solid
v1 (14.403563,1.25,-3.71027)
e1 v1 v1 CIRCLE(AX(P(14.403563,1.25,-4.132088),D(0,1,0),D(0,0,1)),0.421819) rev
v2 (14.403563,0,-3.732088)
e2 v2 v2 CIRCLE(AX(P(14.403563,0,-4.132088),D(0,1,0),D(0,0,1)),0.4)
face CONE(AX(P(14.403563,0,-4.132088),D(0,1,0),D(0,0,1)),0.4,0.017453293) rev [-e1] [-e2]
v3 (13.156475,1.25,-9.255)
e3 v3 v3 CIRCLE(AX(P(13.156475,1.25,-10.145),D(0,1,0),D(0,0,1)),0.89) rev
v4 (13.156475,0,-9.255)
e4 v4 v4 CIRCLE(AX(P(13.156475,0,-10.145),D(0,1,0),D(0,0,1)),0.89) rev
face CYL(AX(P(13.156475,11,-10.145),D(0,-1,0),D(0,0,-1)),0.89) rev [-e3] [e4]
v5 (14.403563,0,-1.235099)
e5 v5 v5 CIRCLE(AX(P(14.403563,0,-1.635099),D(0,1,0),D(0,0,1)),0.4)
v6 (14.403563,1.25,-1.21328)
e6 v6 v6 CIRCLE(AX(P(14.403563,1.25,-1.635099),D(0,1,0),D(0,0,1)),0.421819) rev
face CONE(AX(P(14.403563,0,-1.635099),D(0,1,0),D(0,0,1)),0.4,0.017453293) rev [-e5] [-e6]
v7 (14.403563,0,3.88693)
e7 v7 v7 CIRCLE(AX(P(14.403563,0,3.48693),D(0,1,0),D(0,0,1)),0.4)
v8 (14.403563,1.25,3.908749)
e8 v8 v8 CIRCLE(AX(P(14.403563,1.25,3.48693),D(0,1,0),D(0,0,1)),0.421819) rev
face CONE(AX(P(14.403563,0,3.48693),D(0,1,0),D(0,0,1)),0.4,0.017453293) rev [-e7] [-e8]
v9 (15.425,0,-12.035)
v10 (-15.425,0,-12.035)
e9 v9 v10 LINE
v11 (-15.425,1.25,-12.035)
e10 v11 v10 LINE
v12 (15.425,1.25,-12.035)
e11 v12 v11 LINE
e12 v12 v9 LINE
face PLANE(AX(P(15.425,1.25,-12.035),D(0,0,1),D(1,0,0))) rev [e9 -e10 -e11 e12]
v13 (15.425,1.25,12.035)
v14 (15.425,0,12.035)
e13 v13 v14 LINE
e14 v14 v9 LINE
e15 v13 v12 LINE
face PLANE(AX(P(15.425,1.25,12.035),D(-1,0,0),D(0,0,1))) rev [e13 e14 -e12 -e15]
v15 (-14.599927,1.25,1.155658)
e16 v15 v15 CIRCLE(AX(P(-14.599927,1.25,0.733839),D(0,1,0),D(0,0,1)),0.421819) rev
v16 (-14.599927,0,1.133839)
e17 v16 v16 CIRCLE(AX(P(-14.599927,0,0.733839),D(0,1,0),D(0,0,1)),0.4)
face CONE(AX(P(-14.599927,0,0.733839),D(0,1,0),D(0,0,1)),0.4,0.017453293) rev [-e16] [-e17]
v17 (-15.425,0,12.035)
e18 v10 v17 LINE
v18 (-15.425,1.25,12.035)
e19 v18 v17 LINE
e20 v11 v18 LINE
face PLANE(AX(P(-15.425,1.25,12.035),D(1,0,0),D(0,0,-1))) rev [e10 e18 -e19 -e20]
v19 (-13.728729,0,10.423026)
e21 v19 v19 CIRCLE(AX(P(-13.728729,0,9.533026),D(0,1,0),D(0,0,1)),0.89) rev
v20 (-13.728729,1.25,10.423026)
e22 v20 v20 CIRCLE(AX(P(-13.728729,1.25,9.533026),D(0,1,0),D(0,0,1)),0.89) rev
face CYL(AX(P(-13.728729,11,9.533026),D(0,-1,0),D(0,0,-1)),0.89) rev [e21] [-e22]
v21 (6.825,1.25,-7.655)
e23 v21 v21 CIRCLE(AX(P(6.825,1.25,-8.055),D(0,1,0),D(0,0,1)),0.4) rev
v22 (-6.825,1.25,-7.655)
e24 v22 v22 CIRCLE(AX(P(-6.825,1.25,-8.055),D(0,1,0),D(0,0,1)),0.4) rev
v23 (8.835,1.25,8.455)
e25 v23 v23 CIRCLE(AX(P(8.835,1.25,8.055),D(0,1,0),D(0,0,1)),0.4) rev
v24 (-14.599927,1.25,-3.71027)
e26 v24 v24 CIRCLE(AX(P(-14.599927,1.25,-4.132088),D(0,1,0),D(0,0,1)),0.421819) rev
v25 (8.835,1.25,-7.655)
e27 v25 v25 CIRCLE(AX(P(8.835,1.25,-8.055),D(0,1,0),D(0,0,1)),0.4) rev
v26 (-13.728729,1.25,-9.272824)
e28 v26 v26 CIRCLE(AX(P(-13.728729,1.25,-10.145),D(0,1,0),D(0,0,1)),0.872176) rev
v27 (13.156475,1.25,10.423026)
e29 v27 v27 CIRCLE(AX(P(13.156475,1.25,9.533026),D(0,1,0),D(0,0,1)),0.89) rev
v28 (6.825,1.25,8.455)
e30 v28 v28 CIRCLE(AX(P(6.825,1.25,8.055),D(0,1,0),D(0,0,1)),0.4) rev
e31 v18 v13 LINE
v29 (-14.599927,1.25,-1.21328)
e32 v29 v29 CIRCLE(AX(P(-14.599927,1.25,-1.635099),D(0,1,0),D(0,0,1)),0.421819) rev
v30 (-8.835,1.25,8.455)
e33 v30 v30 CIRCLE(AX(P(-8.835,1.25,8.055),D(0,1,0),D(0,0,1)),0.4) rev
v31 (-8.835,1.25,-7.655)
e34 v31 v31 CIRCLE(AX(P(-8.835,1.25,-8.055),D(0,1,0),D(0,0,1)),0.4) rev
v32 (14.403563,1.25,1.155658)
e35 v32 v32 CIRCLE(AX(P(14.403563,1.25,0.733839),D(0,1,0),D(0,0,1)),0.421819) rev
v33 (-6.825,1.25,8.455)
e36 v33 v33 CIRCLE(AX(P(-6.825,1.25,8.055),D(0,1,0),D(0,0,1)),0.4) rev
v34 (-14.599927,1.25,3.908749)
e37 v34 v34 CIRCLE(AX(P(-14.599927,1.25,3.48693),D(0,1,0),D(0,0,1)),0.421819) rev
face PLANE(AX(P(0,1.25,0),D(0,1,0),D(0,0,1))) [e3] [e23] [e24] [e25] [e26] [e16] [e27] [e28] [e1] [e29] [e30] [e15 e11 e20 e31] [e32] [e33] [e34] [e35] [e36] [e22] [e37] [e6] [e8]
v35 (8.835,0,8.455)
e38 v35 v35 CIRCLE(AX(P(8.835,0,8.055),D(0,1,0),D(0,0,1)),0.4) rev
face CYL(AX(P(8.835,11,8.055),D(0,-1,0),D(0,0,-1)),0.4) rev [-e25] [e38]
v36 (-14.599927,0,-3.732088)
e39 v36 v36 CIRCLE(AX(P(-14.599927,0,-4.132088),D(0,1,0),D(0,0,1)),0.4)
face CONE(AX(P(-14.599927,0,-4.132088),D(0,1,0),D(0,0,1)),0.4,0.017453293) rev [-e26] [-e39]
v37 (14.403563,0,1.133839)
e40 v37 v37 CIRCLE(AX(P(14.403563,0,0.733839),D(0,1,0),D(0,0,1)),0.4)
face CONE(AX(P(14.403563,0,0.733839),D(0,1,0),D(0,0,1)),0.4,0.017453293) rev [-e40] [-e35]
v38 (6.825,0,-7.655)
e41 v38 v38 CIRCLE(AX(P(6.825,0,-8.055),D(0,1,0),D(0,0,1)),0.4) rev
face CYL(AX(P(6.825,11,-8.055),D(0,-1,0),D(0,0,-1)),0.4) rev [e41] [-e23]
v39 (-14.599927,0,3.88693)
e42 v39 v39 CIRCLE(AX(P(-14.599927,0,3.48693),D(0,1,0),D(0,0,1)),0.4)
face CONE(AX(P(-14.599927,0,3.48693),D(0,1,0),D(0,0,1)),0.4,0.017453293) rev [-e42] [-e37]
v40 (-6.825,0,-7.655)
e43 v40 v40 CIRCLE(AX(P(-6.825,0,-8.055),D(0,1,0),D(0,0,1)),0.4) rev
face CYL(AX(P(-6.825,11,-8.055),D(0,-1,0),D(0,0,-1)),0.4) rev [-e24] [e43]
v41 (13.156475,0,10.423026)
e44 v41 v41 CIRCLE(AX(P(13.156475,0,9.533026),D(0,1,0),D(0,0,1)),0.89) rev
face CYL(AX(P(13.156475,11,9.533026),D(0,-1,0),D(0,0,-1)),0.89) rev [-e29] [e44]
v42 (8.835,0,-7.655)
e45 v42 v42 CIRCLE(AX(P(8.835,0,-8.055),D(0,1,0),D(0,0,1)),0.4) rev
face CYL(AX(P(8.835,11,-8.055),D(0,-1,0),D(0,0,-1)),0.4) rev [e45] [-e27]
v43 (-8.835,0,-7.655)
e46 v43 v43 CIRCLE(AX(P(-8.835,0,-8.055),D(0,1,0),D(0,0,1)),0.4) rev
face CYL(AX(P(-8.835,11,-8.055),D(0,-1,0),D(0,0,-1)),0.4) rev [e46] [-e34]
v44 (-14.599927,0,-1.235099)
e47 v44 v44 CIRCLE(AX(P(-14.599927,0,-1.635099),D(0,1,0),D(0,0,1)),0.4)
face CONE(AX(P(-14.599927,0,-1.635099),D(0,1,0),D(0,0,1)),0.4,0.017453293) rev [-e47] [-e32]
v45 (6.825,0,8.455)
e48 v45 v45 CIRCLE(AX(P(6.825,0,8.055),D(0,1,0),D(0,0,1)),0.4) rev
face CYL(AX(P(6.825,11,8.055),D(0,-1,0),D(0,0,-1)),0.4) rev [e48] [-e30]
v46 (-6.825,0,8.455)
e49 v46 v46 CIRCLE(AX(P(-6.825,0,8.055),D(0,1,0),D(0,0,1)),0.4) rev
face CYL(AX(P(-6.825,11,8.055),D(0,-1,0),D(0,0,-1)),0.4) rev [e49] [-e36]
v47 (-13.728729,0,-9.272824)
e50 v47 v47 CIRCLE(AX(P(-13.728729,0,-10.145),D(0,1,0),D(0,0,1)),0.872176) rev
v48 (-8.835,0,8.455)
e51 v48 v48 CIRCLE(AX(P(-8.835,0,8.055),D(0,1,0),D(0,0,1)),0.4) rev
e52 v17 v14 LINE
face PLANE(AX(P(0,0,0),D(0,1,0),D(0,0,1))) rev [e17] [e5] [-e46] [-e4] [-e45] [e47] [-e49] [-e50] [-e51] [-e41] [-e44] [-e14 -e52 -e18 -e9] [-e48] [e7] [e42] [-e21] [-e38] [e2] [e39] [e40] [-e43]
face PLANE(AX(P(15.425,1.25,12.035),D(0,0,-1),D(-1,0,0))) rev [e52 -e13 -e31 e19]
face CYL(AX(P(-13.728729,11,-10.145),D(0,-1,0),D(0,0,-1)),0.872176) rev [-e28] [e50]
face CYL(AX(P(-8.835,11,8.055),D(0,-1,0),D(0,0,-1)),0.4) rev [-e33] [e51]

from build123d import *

# Parameters (mm, degrees)
SKETCH_1_W               = 30.85
SKETCH_1_H               = 24.07
EXTRUDE_1_DEPTH          = 1.25
CUT_EXTRUDE_1_DEPTH      = 11
CUT_EXTRUDE_1_DEPTH_BACK = 11
SKETCH_2_R               = 0.872176239
SKETCH_2_R_2             = 0.89
SKETCH_2_R_3             = 0.4


# Read off the part's stored shape, not the designer's step: 切除-拉伸2
with BuildPart() as part:
    # 草图1 → 凸台-拉伸1 (new body)
    with BuildSketch(Plane(origin=(0, 0, 0), x_dir=(1, 0, 0), z_dir=(0, 1, 0))):
        Rectangle(SKETCH_1_W, SKETCH_1_H)
    extrude(amount=EXTRUDE_1_DEPTH)

    # 草图2 → 切除-拉伸1 (cut, two sides: drawn at the far end of the back side and taken through both)
    with BuildSketch(Plane(origin=(0, 0, 0), x_dir=(1, 0, 0), z_dir=(0, 1, 0)).offset(-CUT_EXTRUDE_1_DEPTH_BACK)):
        with Locations(Location((-13.728729398, 10.145, 0), (0, 0, 270))):
            Circle(SKETCH_2_R)
        with Locations(Location((-13.728729398, -9.533026001, 0), (0, 0, 270))):
            Circle(SKETCH_2_R_2)
        with Locations(Location((13.15647485, -9.533026001, 0), (0, 0, 270))):
            Circle(SKETCH_2_R_2)
        with Locations(Location((13.15647485, 10.145, 0), (0, 0, 270))):
            Circle(SKETCH_2_R_2)
        with Locations(Location((-8.835, 8.055, 0), (0, 0, 270))):
            Circle(SKETCH_2_R_3)
        with Locations(Location((-6.825, 8.055, 0), (0, 0, 270))):
            Circle(SKETCH_2_R_3)
        with Locations(Location((6.825, 8.055, 0), (0, 0, 270))):
            Circle(SKETCH_2_R_3)
        with Locations(Location((8.835, 8.055, 0), (0, 0, 270))):
            Circle(SKETCH_2_R_3)
        with Locations(Location((-8.835, -8.055, 0), (0, 0, 270))):
            Circle(SKETCH_2_R_3)
        with Locations(Location((-6.825, -8.055, 0), (0, 0, 270))):
            Circle(SKETCH_2_R_3)
        with Locations(Location((6.825, -8.055, 0), (0, 0, 270))):
            Circle(SKETCH_2_R_3)
        with Locations(Location((8.835, -8.055, 0), (0, 0, 270))):
            Circle(SKETCH_2_R_3)
    extrude(amount=CUT_EXTRUDE_1_DEPTH + CUT_EXTRUDE_1_DEPTH_BACK, mode=Mode.SUBTRACT)

    # 切除-拉伸2 outline → 切除-拉伸2 (revolve, cut)
    with BuildSketch(Plane(origin=(14.403562721, 0, -4.132088396), x_dir=(1, 0, 0), z_dir=(0, 0, 1))):
        Polygon((0.421818831, 1.25), (0, 1.25), (0, 0), (0.4, 0), align=None)
    revolve(axis=Axis((14.403562721, 0, -4.132088396), (0, 1, 0)), mode=Mode.SUBTRACT)

    # Cut-Extrude 2 2 outline → Cut-Extrude 2 2 (revolve, cut)
    with BuildSketch(Plane(origin=(-14.599926989, 0, -4.132088396), x_dir=(1, 0, 0), z_dir=(0, 0, 1))):
        Polygon((0.421818831, 1.25), (0, 1.25), (0, 0), (0.4, 0), align=None)
    revolve(axis=Axis((-14.599926989, 0, -4.132088396), (0, 1, 0)), mode=Mode.SUBTRACT)

    # Cut-Extrude 2 3 outline → Cut-Extrude 2 3 (revolve, cut)
    with BuildSketch(Plane(origin=(14.403562721, 0, -1.635099216), x_dir=(1, 0, 0), z_dir=(0, 0, 1))):
        Polygon((0.421818831, 1.25), (0, 1.25), (0, 0), (0.4, 0), align=None)
    revolve(axis=Axis((14.403562721, 0, -1.635099216), (0, 1, 0)), mode=Mode.SUBTRACT)

    # Cut-Extrude 2 4 outline → Cut-Extrude 2 4 (revolve, cut)
    with BuildSketch(Plane(origin=(14.403562721, 0, 0.733839237), x_dir=(1, 0, 0), z_dir=(0, 0, 1))):
        Polygon((0.421818831, 1.25), (0, 1.25), (0, 0), (0.4, 0), align=None)
    revolve(axis=Axis((14.403562721, 0, 0.733839237), (0, 1, 0)), mode=Mode.SUBTRACT)

    # Cut-Extrude 2 5 outline → Cut-Extrude 2 5 (revolve, cut)
    with BuildSketch(Plane(origin=(14.403562721, 0, 3.486929872), x_dir=(1, 0, 0), z_dir=(0, 0, 1))):
        Polygon((0.421818831, 1.25), (0, 1.25), (0, 0), (0.4, 0), align=None)
    revolve(axis=Axis((14.403562721, 0, 3.486929872), (0, 1, 0)), mode=Mode.SUBTRACT)

    # Cut-Extrude 2 6 outline → Cut-Extrude 2 6 (revolve, cut)
    with BuildSketch(Plane(origin=(-14.599926989, 0, 3.486929872), x_dir=(1, 0, 0), z_dir=(0, 0, 1))):
        Polygon((0.421818831, 1.25), (0, 1.25), (0, 0), (0.4, 0), align=None)
    revolve(axis=Axis((-14.599926989, 0, 3.486929872), (0, 1, 0)), mode=Mode.SUBTRACT)

    # Cut-Extrude 2 7 outline → Cut-Extrude 2 7 (revolve, cut)
    with BuildSketch(Plane(origin=(-14.599926989, 0, 0.733839237), x_dir=(1, 0, 0), z_dir=(0, 0, 1))):
        Polygon((0.421818831, 1.25), (0, 1.25), (0, 0), (0.4, 0), align=None)
    revolve(axis=Axis((-14.599926989, 0, 0.733839237), (0, 1, 0)), mode=Mode.SUBTRACT)

    # Cut-Extrude 2 8 outline → Cut-Extrude 2 8 (revolve, cut)
    with BuildSketch(Plane(origin=(-14.599926989, 0, -1.635099216), x_dir=(1, 0, 0), z_dir=(0, 0, 1))):
        Polygon((0.421818831, 1.25), (0, 1.25), (0, 0), (0.4, 0), align=None)
    revolve(axis=Axis((-14.599926989, 0, -1.635099216), (0, 1, 0)), mode=Mode.SUBTRACT)


solid = part.part
